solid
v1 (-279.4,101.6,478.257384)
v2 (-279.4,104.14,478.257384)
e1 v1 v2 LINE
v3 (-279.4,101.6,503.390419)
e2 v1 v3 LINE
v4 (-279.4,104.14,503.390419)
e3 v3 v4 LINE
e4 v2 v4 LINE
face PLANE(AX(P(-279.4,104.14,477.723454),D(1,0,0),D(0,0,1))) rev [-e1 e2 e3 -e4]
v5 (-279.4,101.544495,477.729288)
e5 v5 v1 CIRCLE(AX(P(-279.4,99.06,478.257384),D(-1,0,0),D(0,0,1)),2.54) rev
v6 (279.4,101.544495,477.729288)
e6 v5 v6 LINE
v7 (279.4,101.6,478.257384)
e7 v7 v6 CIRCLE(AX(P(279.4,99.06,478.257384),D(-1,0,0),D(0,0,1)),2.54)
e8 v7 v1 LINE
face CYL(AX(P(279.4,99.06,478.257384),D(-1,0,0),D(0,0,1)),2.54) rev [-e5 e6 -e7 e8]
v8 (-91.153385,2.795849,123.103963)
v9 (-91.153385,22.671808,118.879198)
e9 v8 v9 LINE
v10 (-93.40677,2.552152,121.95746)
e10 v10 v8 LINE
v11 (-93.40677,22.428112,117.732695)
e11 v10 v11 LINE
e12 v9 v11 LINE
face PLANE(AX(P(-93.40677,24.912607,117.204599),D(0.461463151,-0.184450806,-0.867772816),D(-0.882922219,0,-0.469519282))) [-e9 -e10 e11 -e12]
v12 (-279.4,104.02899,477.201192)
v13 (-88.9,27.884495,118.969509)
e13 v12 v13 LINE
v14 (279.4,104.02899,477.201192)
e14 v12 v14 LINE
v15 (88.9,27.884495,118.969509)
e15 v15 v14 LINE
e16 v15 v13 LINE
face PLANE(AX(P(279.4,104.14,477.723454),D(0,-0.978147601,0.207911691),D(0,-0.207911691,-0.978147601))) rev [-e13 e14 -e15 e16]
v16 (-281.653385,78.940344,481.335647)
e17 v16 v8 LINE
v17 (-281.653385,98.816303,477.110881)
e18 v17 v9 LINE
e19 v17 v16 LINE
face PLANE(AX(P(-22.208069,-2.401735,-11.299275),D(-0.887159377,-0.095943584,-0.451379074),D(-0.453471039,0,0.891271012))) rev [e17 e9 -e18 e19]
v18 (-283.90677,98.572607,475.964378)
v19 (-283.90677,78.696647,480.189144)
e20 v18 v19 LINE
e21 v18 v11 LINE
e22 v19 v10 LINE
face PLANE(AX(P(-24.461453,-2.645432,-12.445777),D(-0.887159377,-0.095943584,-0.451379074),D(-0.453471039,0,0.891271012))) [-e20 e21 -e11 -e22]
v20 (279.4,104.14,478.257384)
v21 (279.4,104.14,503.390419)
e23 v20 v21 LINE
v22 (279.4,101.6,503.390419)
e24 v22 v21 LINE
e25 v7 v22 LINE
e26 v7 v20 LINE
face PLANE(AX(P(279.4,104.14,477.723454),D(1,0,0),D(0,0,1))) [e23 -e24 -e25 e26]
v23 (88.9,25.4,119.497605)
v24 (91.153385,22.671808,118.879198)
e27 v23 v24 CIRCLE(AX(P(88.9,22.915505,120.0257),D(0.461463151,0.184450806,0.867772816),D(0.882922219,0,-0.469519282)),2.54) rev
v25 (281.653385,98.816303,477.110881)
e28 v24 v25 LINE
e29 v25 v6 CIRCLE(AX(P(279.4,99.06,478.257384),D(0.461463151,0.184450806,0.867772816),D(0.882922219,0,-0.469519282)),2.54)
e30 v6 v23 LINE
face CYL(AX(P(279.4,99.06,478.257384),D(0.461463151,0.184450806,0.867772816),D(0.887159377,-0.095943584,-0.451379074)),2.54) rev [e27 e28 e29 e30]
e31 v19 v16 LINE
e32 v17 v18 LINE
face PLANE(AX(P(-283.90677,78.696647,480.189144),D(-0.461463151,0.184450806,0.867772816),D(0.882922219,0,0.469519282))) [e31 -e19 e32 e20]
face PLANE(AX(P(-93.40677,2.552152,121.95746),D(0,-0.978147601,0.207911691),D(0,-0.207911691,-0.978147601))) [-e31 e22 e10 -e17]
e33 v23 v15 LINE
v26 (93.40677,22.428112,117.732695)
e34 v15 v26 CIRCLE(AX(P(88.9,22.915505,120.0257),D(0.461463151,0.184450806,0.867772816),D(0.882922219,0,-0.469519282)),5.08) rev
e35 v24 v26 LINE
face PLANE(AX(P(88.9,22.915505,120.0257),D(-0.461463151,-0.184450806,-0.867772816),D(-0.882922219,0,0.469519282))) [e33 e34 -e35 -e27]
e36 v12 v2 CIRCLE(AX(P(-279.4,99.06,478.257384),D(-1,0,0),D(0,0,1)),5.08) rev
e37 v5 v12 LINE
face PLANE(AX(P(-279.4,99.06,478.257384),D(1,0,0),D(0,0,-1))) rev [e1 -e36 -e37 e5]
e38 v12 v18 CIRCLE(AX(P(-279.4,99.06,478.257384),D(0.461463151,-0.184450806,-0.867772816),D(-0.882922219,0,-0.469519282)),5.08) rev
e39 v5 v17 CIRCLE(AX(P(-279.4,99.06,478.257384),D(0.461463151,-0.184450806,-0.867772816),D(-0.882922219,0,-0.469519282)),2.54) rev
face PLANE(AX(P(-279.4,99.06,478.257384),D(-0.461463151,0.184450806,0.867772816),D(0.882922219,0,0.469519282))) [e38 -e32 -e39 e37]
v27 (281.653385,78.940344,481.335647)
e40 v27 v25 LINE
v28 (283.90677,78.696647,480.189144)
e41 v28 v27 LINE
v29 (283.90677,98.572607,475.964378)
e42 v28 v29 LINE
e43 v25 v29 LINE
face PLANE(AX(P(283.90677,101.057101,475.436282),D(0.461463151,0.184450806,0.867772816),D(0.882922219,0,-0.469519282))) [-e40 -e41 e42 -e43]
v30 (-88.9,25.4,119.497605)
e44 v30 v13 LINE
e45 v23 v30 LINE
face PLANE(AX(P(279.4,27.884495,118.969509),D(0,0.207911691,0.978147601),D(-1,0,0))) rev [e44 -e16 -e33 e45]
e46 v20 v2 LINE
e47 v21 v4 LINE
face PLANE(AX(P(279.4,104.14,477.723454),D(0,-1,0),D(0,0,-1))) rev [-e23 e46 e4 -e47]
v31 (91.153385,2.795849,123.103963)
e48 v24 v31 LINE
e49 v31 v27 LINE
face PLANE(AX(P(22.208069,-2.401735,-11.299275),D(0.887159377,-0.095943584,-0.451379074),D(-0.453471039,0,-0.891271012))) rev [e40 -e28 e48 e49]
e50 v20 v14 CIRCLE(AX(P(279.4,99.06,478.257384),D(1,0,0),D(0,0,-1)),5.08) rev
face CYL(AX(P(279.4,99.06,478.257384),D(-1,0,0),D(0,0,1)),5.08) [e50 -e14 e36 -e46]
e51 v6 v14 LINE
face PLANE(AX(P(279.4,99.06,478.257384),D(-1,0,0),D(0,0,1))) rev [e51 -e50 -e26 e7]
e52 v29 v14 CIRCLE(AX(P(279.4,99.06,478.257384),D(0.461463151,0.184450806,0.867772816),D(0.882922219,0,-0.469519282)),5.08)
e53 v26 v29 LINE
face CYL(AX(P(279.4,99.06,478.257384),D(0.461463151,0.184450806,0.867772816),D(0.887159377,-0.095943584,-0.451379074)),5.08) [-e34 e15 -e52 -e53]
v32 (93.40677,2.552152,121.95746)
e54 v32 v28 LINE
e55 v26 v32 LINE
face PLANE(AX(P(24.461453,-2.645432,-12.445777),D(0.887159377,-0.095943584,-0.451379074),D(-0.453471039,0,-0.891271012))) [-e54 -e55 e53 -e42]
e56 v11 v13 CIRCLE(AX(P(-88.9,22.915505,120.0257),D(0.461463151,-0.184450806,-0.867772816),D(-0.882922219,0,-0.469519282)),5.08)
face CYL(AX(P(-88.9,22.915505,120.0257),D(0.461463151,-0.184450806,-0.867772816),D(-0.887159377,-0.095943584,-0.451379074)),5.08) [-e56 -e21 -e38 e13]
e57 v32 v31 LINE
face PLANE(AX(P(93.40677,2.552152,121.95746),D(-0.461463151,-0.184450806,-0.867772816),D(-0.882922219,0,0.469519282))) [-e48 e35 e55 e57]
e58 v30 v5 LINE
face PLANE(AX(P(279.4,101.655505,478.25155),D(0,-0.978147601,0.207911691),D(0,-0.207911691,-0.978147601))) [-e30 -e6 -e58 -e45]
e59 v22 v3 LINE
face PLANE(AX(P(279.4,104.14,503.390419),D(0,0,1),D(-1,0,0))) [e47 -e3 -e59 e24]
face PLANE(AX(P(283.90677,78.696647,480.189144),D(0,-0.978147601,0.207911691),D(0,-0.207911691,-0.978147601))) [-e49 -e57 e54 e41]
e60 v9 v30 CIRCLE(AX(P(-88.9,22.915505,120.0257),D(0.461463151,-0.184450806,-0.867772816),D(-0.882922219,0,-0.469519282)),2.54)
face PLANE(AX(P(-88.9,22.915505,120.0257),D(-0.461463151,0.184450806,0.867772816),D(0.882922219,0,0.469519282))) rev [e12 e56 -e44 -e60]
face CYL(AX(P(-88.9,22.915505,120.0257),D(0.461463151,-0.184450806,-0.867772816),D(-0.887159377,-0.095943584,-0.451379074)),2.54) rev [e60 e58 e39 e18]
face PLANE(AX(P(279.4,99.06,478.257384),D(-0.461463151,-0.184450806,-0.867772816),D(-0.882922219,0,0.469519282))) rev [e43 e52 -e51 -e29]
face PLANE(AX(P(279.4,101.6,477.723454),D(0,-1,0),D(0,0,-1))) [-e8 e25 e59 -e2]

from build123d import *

# Parameters (mm, degrees)
BOSS_EXTRUDE1_DEPTH     = 279.4
CONVERT_SOLID1_START    = -279.4
CONVERT_SOLID1_DEPTH    = 558.8
CONVERT_SOLID1_2_DEPTH  = 558.8
CUT_EXTRUDE1_DEPTH      = 586.091506768
EDGE_FLANGE1_DEPTH      = 412.817360463
EDGE_FLANGE1_BEND_DEPTH = 412.817360463
CUT_EXTRUDE2_DEPTH      = 588.256983898
CUT_EXTRUDE2_DEPTH_BACK = 588.256983898
SKETCH12_R              = 7.9375


# Read off the part's stored shape, not the designer's step: Convert-Solid1
# Sheet-metal steps are written as plain solids
with BuildPart() as part:
    # Sketch3 → Boss-Extrude1 (new, symmetric)
    with BuildSketch(Plane(origin=(0, 0, 0), x_dir=(0, 0, -1), z_dir=(1, 0, 0))):
        Polygon((-477.990419123, 101.6), (-503.390419123, 101.6), (-503.390419123, 104.14), (-477.723454365, 104.14), (-118.969509086, 27.884494906), (-119.497604781, 25.4), align=None)
    extrude(amount=BOSS_EXTRUDE1_DEPTH, both=True)

    # Convert-Solid1 outline → Convert-Solid1 (cut)
    with BuildSketch(Plane.YZ.offset(CONVERT_SOLID1_START)):
        with BuildLine():
            Line((104.14, 477.723454365), (104.14, 478.257383881))
            ThreePointArc((104.14, 478.257383881), (104.112171228, 477.726379287), (104.028989812, 477.201192491))
            Line((104.028989812, 477.201192491), (104.14, 477.723454365))
        make_face()
    extrude(amount=CONVERT_SOLID1_DEPTH, mode=Mode.SUBTRACT)

    # Convert-Solid1 2 outline → Convert-Solid1 2 (add)
    with BuildSketch(Plane.YZ.offset(CONVERT_SOLID1_START)):
        with BuildLine():
            Line((101.6, 477.990419123), (101.6, 478.257383881))
            ThreePointArc((101.6, 478.257383881), (101.586085614, 477.991881584), (101.544494906, 477.729288186))
            Line((101.544494906, 477.729288186), (101.6, 477.990419123))
        make_face()
    extrude(amount=CONVERT_SOLID1_2_DEPTH)

    # Sketch8 → Cut-Extrude1 (cut, through all)
    with BuildSketch(Plane(origin=(0, 2.484494906, -0.528095695), x_dir=(1, 0, 0), z_dir=(0, 0.9781476007338071, -0.2079116908177526))):
        Polygon((279.4, -488.402044668), (88.9, -122.167252357), (279.4, -122.167252357), align=None)
        Polygon((-88.9, -122.167252357), (-279.4, -488.402044668), (-279.4, -122.167252357), align=None)
    extrude(amount=-CUT_EXTRUDE1_DEPTH, mode=Mode.SUBTRACT)

    # Edge-Flange1 section (across the edge) → Edge-Flange1 (add)
    with BuildSketch(Plane(origin=(91.153384818, 25.156303297, 118.351101933), x_dir=(-0.8871593769725213, 0.09594358400127492, 0.4513790741037053), z_dir=(0.4614631511288068, 0.18445080609118078, 0.8677728160541709))):
        with BuildLine():
            Line((-2.54, 2.54), (-2.54, 22.86))
            Line((-2.54, 22.86), (0, 22.86))
            Line((0, 22.86), (0, 2.54))
            ThreePointArc((0, 2.54), (0.743948776, 0.743948776), (2.54, 0))
            Line((2.54, 0), (2.54, -2.54))
            ThreePointArc((2.54, -2.54), (-1.052102448, -1.052102448), (-2.54, 2.54))
        make_face()
    extrude(amount=EDGE_FLANGE1_DEPTH)

    # Edge-Flange1 section 2 (across the edge) → Edge-Flange1 bend (add)
    with BuildSketch(Plane(origin=(-281.653384818, 101.300798203, 476.582785338), x_dir=(0.8871593769725281, 0.09594358400127215, 0.45137907410369243), z_dir=(0.4614631511287936, -0.18445080609118217, -0.8677728160541774))):
        with BuildLine():
            Line((-2.54, 2.54), (-2.54, 22.86))
            Line((-2.54, 22.86), (0, 22.86))
            Line((0, 22.86), (0, 2.54))
            ThreePointArc((0, 2.54), (0.743948776, 0.743948776), (2.54, 0))
            Line((2.54, 0), (2.54, -2.54))
            ThreePointArc((2.54, -2.54), (-1.052102448, -1.052102448), (-2.54, 2.54))
        make_face()
    extrude(amount=EDGE_FLANGE1_BEND_DEPTH)

    # Sketch12 → Cut-Extrude2 (cut, two sides: drawn at the far end of the back side and taken through both)
    with BuildSketch(Plane(origin=(0, 2.484494906, -0.528095695), x_dir=(1, 0, 0), z_dir=(0, 0.9781476007338071, -0.2079116908177526)).offset(-CUT_EXTRUDE2_DEPTH_BACK)):
        with Locations((-20.371926238, 129.188925745)):
            Circle(SKETCH12_R)
        with Locations((120.282042226, -141.217252357)):
            Circle(SKETCH12_R)
    cut_extrude2 = extrude(amount=CUT_EXTRUDE2_DEPTH + CUT_EXTRUDE2_DEPTH_BACK, mode=Mode.SUBTRACT)

    # Mirror8: Cut-Extrude2 across plane
    add(cut_extrude2.mirror(Plane(origin=(0, 0, 0), x_dir=(0, 0, 1), z_dir=(1, 0, 0))), mode=Mode.SUBTRACT)


solid = part.part
